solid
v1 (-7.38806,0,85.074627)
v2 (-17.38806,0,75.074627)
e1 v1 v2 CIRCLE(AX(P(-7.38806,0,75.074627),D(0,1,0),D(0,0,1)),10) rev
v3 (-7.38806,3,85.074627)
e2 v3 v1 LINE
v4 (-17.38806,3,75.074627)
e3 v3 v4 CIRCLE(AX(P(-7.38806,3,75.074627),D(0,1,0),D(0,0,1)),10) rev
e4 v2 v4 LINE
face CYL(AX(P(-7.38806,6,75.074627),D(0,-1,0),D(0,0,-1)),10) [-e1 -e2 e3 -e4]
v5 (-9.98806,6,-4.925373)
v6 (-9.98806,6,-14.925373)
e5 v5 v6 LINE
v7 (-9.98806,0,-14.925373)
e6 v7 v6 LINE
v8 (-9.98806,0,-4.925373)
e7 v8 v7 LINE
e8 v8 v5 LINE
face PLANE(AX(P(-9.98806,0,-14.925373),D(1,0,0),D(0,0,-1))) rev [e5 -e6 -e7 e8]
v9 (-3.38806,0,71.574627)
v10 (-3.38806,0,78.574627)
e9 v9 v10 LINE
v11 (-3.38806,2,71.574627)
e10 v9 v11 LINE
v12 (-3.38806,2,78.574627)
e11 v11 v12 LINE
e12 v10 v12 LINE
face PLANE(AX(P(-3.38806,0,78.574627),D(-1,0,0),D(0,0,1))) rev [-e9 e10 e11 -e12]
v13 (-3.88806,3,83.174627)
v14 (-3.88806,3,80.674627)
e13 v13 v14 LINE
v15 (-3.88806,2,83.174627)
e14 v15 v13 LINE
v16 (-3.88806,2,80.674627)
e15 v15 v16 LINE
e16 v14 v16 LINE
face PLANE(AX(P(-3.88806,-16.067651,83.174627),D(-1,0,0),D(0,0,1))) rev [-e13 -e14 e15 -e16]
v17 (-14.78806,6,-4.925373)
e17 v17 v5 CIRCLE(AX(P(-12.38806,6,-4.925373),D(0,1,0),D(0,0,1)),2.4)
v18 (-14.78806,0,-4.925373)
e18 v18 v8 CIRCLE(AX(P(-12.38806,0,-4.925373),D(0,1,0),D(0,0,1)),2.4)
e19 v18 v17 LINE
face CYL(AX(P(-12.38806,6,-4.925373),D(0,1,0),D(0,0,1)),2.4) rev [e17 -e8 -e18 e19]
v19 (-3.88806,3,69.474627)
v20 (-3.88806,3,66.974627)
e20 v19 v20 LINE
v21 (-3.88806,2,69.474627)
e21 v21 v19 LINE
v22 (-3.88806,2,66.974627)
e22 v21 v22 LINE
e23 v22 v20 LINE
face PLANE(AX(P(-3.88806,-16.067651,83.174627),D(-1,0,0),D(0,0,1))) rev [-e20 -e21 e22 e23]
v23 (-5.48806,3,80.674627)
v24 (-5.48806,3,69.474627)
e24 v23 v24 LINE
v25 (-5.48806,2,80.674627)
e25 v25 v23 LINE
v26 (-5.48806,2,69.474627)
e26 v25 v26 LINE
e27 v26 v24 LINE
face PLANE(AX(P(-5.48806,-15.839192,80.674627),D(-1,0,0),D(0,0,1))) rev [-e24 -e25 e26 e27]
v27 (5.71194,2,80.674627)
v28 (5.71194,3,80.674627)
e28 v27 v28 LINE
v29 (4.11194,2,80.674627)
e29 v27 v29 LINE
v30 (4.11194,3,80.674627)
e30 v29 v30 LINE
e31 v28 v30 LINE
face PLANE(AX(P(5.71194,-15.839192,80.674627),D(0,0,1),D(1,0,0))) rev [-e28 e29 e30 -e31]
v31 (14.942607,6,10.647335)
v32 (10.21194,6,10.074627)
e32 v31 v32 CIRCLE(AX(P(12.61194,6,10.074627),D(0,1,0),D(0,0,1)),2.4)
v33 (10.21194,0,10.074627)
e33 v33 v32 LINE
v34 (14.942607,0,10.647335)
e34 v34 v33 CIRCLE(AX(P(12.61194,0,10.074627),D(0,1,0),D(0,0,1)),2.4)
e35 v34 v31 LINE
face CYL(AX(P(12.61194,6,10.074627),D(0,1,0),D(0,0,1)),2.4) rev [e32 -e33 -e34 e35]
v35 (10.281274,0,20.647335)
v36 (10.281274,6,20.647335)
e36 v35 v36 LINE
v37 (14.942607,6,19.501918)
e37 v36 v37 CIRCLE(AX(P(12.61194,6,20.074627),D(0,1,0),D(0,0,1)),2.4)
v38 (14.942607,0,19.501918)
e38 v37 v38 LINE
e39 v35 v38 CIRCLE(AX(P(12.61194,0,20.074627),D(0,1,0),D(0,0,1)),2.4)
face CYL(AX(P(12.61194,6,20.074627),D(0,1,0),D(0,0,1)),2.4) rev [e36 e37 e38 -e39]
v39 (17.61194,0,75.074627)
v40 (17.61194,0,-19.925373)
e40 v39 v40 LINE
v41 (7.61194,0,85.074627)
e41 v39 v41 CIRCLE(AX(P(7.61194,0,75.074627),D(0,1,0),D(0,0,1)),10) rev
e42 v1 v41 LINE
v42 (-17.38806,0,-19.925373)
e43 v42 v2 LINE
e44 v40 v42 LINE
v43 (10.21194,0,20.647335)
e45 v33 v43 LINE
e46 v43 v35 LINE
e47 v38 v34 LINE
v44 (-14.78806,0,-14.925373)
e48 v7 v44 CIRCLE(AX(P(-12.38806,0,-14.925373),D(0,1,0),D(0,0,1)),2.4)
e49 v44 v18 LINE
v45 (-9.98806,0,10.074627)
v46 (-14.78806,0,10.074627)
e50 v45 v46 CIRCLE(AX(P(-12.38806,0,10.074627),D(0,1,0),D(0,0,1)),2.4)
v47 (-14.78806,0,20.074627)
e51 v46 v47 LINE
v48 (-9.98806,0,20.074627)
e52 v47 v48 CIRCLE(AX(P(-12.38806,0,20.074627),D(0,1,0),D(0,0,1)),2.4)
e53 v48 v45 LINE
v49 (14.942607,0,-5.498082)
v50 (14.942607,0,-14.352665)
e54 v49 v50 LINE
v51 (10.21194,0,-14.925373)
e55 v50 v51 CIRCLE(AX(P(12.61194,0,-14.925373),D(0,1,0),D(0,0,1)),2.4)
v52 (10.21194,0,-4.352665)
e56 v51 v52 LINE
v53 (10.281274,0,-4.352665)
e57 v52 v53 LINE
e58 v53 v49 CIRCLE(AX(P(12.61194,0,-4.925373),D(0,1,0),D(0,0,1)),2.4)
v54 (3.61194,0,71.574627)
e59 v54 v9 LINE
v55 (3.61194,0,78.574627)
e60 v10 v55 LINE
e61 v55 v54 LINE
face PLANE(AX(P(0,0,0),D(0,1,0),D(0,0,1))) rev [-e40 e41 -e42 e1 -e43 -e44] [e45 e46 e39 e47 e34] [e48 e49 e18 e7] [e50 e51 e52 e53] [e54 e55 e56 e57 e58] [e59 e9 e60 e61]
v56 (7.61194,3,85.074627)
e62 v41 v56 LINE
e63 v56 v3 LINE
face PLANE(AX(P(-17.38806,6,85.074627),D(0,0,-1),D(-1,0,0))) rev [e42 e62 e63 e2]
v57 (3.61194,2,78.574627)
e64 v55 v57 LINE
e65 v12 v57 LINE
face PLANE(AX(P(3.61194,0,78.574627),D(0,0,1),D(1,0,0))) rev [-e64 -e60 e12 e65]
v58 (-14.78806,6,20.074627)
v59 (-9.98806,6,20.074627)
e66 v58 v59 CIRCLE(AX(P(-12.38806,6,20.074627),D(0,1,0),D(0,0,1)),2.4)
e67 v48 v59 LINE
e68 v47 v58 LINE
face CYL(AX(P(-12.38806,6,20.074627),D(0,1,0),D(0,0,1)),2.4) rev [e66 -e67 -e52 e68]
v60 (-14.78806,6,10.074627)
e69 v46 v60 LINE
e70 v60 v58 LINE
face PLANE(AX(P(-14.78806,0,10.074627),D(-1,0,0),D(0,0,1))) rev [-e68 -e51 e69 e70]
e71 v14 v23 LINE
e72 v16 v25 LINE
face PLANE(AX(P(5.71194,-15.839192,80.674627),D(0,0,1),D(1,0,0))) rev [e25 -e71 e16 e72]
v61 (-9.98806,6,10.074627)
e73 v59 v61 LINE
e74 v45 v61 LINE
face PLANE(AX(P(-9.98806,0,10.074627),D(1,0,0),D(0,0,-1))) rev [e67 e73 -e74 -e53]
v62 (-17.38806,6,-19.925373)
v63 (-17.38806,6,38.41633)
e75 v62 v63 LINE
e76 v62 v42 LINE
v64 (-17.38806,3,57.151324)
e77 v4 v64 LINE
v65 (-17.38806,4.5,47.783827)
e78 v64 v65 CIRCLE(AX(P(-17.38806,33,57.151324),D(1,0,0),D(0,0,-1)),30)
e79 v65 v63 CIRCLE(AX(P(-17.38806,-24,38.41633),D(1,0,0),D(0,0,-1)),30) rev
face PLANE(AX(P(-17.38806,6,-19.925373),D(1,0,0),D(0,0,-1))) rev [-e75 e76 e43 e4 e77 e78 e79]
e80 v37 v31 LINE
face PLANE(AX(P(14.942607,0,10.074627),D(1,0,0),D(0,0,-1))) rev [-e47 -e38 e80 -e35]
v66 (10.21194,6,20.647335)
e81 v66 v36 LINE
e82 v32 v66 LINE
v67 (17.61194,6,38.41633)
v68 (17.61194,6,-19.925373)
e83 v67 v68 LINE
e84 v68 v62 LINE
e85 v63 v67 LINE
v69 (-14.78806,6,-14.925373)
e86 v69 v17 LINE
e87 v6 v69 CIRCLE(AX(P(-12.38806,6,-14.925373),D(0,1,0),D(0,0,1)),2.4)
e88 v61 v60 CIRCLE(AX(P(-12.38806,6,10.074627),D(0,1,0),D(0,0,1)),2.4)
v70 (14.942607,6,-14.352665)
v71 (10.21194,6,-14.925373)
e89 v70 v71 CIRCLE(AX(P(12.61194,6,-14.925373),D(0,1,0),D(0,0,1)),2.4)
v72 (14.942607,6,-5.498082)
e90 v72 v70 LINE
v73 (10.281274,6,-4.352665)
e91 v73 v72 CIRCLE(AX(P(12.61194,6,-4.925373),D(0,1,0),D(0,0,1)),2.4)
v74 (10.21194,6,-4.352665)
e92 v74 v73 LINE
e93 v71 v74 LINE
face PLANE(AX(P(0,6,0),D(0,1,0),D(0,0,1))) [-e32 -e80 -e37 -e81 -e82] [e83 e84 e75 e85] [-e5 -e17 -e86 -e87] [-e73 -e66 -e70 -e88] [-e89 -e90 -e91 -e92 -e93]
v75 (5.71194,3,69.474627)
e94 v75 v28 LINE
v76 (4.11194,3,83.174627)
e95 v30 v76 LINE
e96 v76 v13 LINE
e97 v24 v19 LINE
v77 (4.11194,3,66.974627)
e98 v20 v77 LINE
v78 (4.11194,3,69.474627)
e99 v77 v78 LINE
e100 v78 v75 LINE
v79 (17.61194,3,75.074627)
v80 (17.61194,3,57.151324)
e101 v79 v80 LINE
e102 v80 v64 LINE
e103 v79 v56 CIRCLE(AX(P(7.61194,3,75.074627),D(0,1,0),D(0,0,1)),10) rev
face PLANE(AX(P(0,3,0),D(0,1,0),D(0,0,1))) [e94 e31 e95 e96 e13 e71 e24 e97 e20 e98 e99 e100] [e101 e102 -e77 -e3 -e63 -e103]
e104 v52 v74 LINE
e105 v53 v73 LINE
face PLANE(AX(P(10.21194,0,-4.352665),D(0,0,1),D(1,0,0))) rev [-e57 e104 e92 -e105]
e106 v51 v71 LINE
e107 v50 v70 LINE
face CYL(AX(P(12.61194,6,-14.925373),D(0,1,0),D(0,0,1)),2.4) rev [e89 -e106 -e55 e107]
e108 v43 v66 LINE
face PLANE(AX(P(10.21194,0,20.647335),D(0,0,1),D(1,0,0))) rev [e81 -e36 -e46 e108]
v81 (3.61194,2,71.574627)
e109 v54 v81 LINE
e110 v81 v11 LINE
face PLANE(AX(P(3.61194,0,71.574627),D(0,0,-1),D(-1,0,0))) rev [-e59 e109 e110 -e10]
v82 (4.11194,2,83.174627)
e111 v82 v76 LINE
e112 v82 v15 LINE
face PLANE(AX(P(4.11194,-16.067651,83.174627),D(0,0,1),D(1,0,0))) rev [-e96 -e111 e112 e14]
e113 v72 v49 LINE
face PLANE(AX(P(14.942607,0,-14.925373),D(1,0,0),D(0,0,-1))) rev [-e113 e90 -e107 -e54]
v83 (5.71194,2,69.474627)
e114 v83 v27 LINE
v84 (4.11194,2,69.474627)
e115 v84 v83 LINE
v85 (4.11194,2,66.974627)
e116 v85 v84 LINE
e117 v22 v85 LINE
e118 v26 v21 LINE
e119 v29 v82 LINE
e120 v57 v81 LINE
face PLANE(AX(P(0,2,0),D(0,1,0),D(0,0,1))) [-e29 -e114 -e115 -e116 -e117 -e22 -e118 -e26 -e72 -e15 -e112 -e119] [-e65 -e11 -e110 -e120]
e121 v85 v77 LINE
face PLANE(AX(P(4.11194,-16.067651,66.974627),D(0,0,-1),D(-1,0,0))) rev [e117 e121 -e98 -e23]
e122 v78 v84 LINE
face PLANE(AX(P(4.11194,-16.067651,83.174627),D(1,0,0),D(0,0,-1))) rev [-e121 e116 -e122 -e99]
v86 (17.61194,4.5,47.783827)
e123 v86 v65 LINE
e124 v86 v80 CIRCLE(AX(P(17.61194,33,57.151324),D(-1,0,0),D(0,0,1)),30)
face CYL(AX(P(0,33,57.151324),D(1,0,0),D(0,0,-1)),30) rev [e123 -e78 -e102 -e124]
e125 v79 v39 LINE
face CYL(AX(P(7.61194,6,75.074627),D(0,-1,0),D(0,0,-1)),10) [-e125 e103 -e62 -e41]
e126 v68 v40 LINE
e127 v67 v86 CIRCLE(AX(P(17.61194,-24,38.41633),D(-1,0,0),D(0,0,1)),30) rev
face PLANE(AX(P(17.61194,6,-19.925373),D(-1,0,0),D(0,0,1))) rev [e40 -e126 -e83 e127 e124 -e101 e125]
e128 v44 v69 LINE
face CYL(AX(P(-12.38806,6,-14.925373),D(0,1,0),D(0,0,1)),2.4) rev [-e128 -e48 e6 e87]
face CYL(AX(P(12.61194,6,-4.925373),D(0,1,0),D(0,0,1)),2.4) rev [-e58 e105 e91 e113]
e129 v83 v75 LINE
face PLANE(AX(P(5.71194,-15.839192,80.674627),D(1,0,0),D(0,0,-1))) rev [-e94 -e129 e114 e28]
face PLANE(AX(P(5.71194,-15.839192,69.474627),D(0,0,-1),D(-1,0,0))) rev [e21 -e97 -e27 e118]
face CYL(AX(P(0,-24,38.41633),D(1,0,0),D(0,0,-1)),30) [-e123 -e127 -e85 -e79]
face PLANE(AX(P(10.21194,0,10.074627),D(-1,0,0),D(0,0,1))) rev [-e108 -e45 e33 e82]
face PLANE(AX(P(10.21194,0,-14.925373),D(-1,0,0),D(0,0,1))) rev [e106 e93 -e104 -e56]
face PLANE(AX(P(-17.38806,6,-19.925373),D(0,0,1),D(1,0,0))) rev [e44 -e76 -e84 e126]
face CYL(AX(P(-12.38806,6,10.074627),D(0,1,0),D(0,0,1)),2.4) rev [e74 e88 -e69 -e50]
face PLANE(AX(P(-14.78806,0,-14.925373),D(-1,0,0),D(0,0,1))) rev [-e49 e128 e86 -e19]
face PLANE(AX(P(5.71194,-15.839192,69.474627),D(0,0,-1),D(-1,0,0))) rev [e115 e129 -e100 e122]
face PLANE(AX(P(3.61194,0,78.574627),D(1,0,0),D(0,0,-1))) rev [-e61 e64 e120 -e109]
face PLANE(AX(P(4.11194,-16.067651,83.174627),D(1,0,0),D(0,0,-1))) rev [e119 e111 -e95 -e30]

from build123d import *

# Parameters (mm, degrees)
SKETCH1_W            = 35
SKETCH1_H            = 105
BOSS_EXTRUDE1_DEPTH  = 6
M4_CLEARANCE_HOLE1_D = 4.8
LPATTERN2_COUNT      = 2
LPATTERN2_PITCH      = 10
SKETCH5_W            = 4.8
SKETCH5_H            = 10
SKETCH5_W_2          = 4.730666207
SKETCH5_H_2          = 10.572708501
CUT_EXTRUDE1_DEPTH   = 88.085432636
SKETCH6_W            = 11.2
SKETCH6_H            = 11.2
CUT_EXTRUDE2_DEPTH   = 4
SKETCH7_W            = 7
SKETCH7_H            = 7
CUT_EXTRUDE3_DEPTH   = 87.970527062
SKETCH8_W            = 8
SKETCH8_H            = 16.2
CUT_EXTRUDE4_DEPTH   = 4
FILLET1_R            = 10
CUT_EXTRUDE5_START   = -6
SKETCH9_W            = 37.049954943
SKETCH9_H            = 41
CUT_EXTRUDE5_DEPTH   = 3
FILLET2_R            = 30
FILLET3_R            = 30


with BuildPart() as part:
    # Sketch1 → Boss-Extrude1 (new body)
    with BuildSketch(Plane(origin=(0, 0, 0), x_dir=(1, 0, 0), z_dir=(0, 1, 0))):
        with Locations((0.111940299, -32.574626866)):
            Rectangle(SKETCH1_W, SKETCH1_H)
    extrude(amount=BOSS_EXTRUDE1_DEPTH)

    # M4 Clearance Hole1 (through all)
    with Locations(Plane(origin=(0, 6, 0), x_dir=(1, 0, 0), z_dir=(0, 1, 0))):
        with Locations((-12.388059701, 14.925373134), (12.611940299, 14.925373134), (12.611940299, -10.074626866), (-12.388059701, -10.074626866)):
            m4_clearance_hole1 = Hole(M4_CLEARANCE_HOLE1_D / 2)

    # LPattern2: M4 Clearance Hole1 ×2
    with Locations(*[(0, 0, i * LPATTERN2_PITCH) for i in range(1, LPATTERN2_COUNT)]):
        add(m4_clearance_hole1, mode=Mode.SUBTRACT)

    # Sketch5 → Cut-Extrude1 (cut, through all)
    with BuildSketch(Plane(origin=(0, 6, 0), x_dir=(1, 0, 0), z_dir=(0, 1, 0))):
        with Locations((-12.388059701, 9.925373134)):
            Rectangle(SKETCH5_W, SKETCH5_H)
        with Locations((-12.388059701, -15.074626866)):
            Rectangle(SKETCH5_W, SKETCH5_H)
        with Locations((12.577273403, 9.639018884)):
            Rectangle(SKETCH5_W_2, SKETCH5_H_2)
        with Locations((12.577273403, -15.360981116)):
            Rectangle(SKETCH5_W_2, SKETCH5_H_2)
    extrude(amount=-CUT_EXTRUDE1_DEPTH, mode=Mode.SUBTRACT)

    # Sketch6 → Cut-Extrude2 (cut)
    with BuildSketch(Plane(origin=(0, 6, 0), x_dir=(1, 0, 0), z_dir=(0, 1, 0))):
        with Locations((0.111940299, -75.074626866)):
            Rectangle(SKETCH6_W, SKETCH6_H)
    extrude(amount=-CUT_EXTRUDE2_DEPTH, mode=Mode.SUBTRACT)

    # Sketch7 → Cut-Extrude3 (cut, through all)
    with BuildSketch(Plane(origin=(0, 2, 0), x_dir=(1, 0, 0), z_dir=(0, 1, 0))):
        with Locations((0.111940299, -75.074626866)):
            Rectangle(SKETCH7_W, SKETCH7_H)
    extrude(amount=-CUT_EXTRUDE3_DEPTH, mode=Mode.SUBTRACT)

    # Sketch8 → Cut-Extrude4 (cut)
    with BuildSketch(Plane(origin=(0, 6, 0), x_dir=(1, 0, 0), z_dir=(0, 1, 0))):
        with Locations((0.111940299, -75.074626866)):
            Rectangle(SKETCH8_W, SKETCH8_H)
    extrude(amount=-CUT_EXTRUDE4_DEPTH, mode=Mode.SUBTRACT)

    # Fillet1
    fillet1_edges = [part.edges().sort_by_distance(p)[0] for p in [
        (17.611940299, 3, 85.074626866),
        (-17.388059701, 3, 85.074626866),
    ]]
    fillet(fillet1_edges, radius=FILLET1_R)

    # Sketch9 → Cut-Extrude5 (cut)
    with BuildSketch(Plane.XZ.offset(CUT_EXTRUDE5_START)):
        with Locations((1.136917771, 64.574626866)):
            Rectangle(SKETCH9_W, SKETCH9_H)
    extrude(amount=CUT_EXTRUDE5_DEPTH, mode=Mode.SUBTRACT)

    # Fillet2
    # the kernel refuses this fillet: 30 mm, written as the material it adds along each edge
    with BuildSketch(Plane(origin=(-17.388059701, 3, 44.074626866), x_dir=(0, 1, 0), z_dir=(1, 0, 0))) as fillet2_piece_1:
        with BuildLine():
            CenterArc((30, 13.076696831), FILLET2_R, 180, 25.841932763)
            Line((0, 13.076696831), (-0.6, 13.076696831))
            Line((-0.6, 13.076696831), (-0.6, 0))
            Line((-0.6, 0), (0, -0.6))
            ThreePointArc((0, -0.6), (1.5, -0.6), (2.46, -0.261533937))
            Line((2.46, -0.261533937), (3, 0))
        make_face()
    extrude(amount=35)

    # Fillet3
    fillet3_edges = [part.edges().sort_by_distance(p)[0] for p in [
        (0.111940299, 6, 44.074626866),
    ]]
    fillet(fillet3_edges, radius=FILLET3_R)


solid = part.part
